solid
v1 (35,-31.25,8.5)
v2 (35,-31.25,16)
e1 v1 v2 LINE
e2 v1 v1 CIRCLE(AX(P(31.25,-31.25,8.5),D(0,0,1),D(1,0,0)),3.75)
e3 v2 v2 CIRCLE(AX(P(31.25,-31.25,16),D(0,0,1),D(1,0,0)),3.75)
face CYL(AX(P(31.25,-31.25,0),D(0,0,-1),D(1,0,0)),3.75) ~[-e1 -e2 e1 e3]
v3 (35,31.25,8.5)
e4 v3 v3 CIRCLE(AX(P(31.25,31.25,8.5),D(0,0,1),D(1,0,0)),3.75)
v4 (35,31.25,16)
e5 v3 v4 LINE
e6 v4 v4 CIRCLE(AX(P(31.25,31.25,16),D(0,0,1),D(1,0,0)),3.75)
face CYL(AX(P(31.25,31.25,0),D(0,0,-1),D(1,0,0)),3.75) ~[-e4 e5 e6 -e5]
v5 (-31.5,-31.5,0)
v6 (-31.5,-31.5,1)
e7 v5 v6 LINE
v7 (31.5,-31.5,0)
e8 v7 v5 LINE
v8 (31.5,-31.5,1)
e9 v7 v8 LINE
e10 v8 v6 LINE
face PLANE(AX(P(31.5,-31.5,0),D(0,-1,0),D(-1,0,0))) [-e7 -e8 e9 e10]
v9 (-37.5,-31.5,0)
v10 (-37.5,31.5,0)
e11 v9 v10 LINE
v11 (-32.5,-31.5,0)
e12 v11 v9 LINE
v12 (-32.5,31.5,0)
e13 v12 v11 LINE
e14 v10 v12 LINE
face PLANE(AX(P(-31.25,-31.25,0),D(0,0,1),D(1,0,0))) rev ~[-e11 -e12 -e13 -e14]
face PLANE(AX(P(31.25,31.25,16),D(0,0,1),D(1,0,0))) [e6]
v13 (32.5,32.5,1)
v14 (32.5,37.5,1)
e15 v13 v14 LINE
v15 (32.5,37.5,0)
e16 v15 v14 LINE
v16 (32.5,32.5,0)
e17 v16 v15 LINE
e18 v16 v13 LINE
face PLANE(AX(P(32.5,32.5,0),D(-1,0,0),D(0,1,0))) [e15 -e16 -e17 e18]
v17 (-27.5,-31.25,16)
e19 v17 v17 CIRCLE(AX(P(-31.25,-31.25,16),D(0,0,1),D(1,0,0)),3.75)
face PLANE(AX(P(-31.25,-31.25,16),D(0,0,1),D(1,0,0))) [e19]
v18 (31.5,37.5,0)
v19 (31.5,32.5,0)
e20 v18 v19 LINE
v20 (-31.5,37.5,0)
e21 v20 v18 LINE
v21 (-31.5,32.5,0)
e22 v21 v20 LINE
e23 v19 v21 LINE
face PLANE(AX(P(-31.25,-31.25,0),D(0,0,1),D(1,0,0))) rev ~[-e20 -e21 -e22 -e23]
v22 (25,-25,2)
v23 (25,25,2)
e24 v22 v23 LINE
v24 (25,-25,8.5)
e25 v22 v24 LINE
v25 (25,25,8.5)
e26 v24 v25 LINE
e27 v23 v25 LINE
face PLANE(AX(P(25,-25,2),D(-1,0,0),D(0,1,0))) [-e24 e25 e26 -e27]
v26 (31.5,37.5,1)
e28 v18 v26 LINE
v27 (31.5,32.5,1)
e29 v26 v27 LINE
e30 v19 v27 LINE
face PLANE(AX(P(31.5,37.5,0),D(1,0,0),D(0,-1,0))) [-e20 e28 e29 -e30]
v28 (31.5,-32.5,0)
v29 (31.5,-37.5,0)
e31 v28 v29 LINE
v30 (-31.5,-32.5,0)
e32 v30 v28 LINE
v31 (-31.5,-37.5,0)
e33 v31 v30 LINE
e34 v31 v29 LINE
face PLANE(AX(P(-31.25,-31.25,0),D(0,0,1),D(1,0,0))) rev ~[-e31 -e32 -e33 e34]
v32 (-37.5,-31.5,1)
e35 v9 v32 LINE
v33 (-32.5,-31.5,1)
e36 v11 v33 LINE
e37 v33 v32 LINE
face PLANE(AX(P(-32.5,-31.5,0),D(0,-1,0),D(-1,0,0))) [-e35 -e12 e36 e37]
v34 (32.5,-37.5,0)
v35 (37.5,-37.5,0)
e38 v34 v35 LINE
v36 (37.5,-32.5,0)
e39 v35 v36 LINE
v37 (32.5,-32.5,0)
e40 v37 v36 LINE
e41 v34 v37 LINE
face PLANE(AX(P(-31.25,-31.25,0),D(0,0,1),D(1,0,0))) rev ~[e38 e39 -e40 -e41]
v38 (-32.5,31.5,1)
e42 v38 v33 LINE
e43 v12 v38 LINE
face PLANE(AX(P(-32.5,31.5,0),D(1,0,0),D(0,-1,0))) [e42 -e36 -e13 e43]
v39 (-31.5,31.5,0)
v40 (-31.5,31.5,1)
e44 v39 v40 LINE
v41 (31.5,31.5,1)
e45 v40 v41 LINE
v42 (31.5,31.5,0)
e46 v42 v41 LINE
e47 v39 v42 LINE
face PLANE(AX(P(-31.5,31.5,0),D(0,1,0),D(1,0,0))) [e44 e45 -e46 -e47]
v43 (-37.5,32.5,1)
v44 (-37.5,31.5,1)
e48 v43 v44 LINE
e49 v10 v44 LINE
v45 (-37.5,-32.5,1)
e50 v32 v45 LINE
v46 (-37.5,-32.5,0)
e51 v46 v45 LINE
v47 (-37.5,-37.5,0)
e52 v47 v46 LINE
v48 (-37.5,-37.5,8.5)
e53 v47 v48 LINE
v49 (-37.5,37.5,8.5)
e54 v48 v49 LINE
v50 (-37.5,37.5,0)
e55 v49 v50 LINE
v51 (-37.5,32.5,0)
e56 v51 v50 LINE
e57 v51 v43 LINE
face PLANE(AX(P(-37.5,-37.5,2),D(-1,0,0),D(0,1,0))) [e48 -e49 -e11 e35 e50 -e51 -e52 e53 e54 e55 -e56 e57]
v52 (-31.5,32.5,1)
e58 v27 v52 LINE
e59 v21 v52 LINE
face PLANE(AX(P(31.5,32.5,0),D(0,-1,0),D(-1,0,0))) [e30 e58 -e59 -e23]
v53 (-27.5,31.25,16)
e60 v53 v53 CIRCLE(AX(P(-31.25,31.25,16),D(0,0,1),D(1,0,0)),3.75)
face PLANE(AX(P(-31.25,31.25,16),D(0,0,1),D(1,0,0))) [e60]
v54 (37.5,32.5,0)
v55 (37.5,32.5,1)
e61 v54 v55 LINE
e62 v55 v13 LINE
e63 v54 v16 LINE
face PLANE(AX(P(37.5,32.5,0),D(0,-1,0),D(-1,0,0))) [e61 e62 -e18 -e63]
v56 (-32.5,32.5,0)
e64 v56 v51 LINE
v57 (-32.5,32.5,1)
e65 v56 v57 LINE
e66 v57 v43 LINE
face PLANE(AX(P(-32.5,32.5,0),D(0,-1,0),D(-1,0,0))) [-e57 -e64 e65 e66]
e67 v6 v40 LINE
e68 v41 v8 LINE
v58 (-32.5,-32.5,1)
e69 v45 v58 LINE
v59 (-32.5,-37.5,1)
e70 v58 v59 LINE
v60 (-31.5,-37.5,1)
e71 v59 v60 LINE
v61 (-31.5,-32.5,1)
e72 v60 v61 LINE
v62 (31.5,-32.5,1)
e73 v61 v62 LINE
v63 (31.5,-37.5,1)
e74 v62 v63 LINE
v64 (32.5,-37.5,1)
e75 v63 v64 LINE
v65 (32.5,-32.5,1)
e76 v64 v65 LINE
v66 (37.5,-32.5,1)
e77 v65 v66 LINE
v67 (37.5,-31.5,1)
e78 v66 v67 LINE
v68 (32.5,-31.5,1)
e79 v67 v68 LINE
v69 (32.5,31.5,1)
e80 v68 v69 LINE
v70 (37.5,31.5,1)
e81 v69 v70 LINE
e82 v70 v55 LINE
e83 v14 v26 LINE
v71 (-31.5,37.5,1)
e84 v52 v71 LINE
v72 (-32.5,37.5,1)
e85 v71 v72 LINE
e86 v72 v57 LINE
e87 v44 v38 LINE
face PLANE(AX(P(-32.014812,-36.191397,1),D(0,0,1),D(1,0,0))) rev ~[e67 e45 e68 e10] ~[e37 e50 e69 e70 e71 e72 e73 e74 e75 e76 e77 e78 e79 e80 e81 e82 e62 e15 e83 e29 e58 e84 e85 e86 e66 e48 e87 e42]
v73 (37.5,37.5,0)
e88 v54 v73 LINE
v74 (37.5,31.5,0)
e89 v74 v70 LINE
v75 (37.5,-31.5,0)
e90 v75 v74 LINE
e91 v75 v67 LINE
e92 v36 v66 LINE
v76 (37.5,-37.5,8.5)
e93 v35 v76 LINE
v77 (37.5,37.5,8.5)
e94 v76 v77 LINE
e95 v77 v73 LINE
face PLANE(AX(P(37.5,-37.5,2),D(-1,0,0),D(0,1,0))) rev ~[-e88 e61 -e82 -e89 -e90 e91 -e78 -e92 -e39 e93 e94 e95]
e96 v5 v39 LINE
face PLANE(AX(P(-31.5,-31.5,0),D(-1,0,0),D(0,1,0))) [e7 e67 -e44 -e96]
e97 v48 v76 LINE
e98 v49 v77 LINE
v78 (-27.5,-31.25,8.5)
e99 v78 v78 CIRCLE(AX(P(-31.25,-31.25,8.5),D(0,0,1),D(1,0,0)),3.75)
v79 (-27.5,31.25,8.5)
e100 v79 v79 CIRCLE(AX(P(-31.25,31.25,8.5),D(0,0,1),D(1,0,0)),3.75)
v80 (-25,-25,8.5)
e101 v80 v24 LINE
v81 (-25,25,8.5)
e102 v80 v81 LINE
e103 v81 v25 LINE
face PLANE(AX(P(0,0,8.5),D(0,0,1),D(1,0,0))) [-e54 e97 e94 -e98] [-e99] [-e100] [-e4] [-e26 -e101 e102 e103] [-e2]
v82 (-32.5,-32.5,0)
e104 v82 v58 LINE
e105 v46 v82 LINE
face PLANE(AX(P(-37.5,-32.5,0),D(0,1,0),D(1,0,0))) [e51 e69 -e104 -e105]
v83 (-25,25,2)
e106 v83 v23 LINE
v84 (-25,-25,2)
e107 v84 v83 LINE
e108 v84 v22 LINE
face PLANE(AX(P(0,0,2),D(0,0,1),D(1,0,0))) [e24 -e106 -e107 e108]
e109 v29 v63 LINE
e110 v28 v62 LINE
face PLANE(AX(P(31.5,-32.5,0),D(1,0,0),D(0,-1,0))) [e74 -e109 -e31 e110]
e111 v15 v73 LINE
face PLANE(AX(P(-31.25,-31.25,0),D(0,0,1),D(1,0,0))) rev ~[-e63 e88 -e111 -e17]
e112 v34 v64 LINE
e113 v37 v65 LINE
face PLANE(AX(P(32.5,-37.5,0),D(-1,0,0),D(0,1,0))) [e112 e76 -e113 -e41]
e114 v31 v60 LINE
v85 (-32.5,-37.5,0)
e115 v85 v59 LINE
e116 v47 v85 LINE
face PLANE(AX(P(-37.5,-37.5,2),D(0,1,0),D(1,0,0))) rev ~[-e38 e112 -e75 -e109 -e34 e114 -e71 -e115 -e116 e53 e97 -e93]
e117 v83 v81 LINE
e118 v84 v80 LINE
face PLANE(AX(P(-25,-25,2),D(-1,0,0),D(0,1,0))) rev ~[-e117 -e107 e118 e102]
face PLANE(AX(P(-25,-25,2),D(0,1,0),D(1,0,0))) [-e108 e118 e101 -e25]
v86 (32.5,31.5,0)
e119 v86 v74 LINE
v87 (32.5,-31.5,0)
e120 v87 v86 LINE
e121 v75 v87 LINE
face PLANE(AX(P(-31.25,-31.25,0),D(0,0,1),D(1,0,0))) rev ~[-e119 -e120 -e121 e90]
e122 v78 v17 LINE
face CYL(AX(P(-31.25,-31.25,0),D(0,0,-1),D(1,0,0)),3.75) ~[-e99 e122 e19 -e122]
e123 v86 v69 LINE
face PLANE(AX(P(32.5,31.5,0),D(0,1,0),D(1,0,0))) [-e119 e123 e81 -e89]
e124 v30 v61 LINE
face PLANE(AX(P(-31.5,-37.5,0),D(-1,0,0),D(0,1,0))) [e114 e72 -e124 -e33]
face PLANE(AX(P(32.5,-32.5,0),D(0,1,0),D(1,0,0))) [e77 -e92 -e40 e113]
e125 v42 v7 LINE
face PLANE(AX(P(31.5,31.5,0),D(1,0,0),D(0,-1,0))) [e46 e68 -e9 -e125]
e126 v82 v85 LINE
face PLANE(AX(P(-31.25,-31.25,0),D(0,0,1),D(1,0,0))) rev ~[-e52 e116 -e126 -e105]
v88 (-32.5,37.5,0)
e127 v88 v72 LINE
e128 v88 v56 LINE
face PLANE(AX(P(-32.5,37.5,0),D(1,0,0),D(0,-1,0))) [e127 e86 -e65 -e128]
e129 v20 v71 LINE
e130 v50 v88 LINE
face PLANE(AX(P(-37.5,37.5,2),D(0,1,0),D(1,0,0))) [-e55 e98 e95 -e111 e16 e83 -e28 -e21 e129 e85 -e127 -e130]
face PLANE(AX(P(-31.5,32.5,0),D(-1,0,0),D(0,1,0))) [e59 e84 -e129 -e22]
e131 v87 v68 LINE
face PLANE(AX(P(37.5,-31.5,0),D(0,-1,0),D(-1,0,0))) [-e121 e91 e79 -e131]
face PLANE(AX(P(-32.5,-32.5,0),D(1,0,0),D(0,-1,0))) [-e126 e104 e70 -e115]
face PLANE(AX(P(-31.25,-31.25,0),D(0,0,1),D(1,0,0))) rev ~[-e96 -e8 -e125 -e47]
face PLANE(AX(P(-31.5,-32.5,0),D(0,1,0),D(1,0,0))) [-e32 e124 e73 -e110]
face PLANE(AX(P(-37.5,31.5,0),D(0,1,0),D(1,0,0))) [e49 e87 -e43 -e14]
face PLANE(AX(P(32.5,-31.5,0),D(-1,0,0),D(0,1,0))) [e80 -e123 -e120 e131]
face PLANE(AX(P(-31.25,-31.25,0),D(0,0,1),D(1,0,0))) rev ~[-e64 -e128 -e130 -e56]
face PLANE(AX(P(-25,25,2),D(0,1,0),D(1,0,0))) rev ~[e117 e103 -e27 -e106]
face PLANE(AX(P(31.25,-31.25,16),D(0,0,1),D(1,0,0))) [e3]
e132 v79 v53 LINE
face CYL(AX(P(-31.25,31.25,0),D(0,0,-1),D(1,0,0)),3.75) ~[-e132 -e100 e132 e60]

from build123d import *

# Parameters (mm, degrees)
F0_W     = 75
F0_H     = 75
F0_R     = 3.75
F1_DEPTH = 2
F2_DEPTH = 16
F3_W     = 75
F3_H     = 75
F3_R     = 3.75
F3_W_2   = 50
F3_H_2   = 50
F4_DEPTH = 6.5
F5_W     = 1
F5_H     = 1
F6_DEPTH = 1


with BuildPart() as f1:
    # F0 (on Top) → F1 (new body)
    with BuildSketch(Plane.XY):
        Rectangle(F0_W, F0_H)
        with Locations((-31.25, -31.25)):
            Circle(F0_R, mode=Mode.SUBTRACT)
        with Locations((31.25, -31.25)):
            Circle(F0_R, mode=Mode.SUBTRACT)
        with Locations((-31.25, 31.25)):
            Circle(F0_R, mode=Mode.SUBTRACT)
        with Locations((31.25, 31.25)):
            Circle(F0_R, mode=Mode.SUBTRACT)
        with Locations((-31.25, 31.25)):
            Circle(F0_R)
        with Locations((31.25, 31.25)):
            Circle(F0_R)
        with Locations((31.25, -31.25)):
            Circle(F0_R)
        with Locations((-31.25, -31.25)):
            Circle(F0_R)
    extrude(amount=F1_DEPTH)

    # F0 (on Top) → F2 (join)
    with BuildSketch(Plane.XY):
        with Locations((-31.25, -31.25)):
            Circle(F0_R)
        with Locations((31.25, -31.25)):
            Circle(F0_R)
        with Locations((-31.25, 31.25)):
            Circle(F0_R)
        with Locations((31.25, 31.25)):
            Circle(F0_R)
    extrude(amount=F2_DEPTH)

    # F3 (on face) → F4 (join)
    with BuildSketch(Plane.XY.offset(2)):
        Rectangle(F3_W, F3_H)
        with Locations((-31.25, -31.25)):
            Circle(F3_R, mode=Mode.SUBTRACT)
        with Locations((31.25, -31.25)):
            Circle(F3_R, mode=Mode.SUBTRACT)
        with Locations((-31.25, 31.25)):
            Circle(F3_R, mode=Mode.SUBTRACT)
        Rectangle(F3_W_2, F3_H_2, mode=Mode.SUBTRACT)
        with Locations((31.25, 31.25)):
            Circle(F3_R, mode=Mode.SUBTRACT)
    extrude(amount=F4_DEPTH)

    # F5 (on face) → F6 (cut)
    with BuildSketch(Plane.XY):
        with BuildLine():
            Line((-32.5, -34.7855339059), (-32.5, -37.5))
            Line((-32.5, -37.5), (-31.5, -37.5))
            Line((-31.5, -37.5), (-31.5, -34.9916573868))
            ThreePointArc((-31.5, -34.9916573868), (-32.0070480317, -34.9227888964), (-32.5, -34.7855339059))
        make_face()
        with BuildLine():
            Line((-32.5, -32.5), (-32.5, -34.7855339059))
            ThreePointArc((-32.5, -34.7855339059), (-32.0070480317, -34.9227888964), (-31.5, -34.9916573868))
            Line((-31.5, -34.9916573868), (-31.5, -32.5))
            Line((-31.5, -32.5), (-32.5, -32.5))
        make_face()
        with BuildLine():
            Line((31.5, -34.9916573868), (31.5, -37.5))
            Line((31.5, -37.5), (32.5, -37.5))
            Line((32.5, -37.5), (32.5, -34.7855339059))
            ThreePointArc((32.5, -34.7855339059), (32.0070480317, -34.9227888964), (31.5, -34.9916573868))
        make_face()
        with BuildLine():
            Line((-34.7855339059, -32.5), (-32.5, -32.5))
            Line((-32.5, -32.5), (-32.5, -31.5))
            Line((-32.5, -31.5), (-34.9916573868, -31.5))
            ThreePointArc((-34.9916573868, -31.5), (-34.9227888964, -32.0070480317), (-34.7855339059, -32.5))
        make_face()
        with Locations((-32, -32)):
            Rectangle(F5_W, F5_H)
        with BuildLine():
            Line((-37.5, -32.5), (-34.7855339059, -32.5))
            ThreePointArc((-34.7855339059, -32.5), (-34.9227888964, -32.0070480317), (-34.9916573868, -31.5))
            Line((-34.9916573868, -31.5), (-37.5, -31.5))
            Line((-37.5, -31.5), (-37.5, -32.5))
        make_face()
        with BuildLine():
            Line((-31.5, -31.5), (-31.5, -32.5))
            Line((-31.5, -32.5), (-27.7144660941, -32.5))
            ThreePointArc((-27.7144660941, -32.5), (-27.5772111036, -32.0070480317), (-27.5083426132, -31.5))
            Line((-27.5083426132, -31.5), (-31.5, -31.5))
        make_face()
        with BuildLine():
            ThreePointArc((-27.5083426132, -31.5), (-27.5772111036, -32.0070480317), (-27.7144660941, -32.5))
            Line((-27.7144660941, -32.5), (27.7144660941, -32.5))
            ThreePointArc((27.7144660941, -32.5), (27.5772111036, -32.0070480317), (27.5083426132, -31.5))
            Line((27.5083426132, -31.5), (-27.5083426132, -31.5))
        make_face()
        with BuildLine():
            Line((31.5, -32.5), (31.5, -34.9916573868))
            ThreePointArc((31.5, -34.9916573868), (32.0070480317, -34.9227888964), (32.5, -34.7855339059))
            Line((32.5, -34.7855339059), (32.5, -32.5))
            Line((32.5, -32.5), (31.5, -32.5))
        make_face()
        with BuildLine():
            Line((-32.5, -27.7144660941), (-32.5, -31.5))
            Line((-32.5, -31.5), (-31.5, -31.5))
            Line((-31.5, -31.5), (-31.5, -27.5083426132))
            ThreePointArc((-31.5, -27.5083426132), (-32.0070480317, -27.5772111036), (-32.5, -27.7144660941))
        make_face()
        with BuildLine():
            ThreePointArc((27.5083426132, -31.5), (27.5772111036, -32.0070480317), (27.7144660941, -32.5))
            Line((27.7144660941, -32.5), (31.5, -32.5))
            Line((31.5, -32.5), (31.5, -31.5))
            Line((31.5, -31.5), (27.5083426132, -31.5))
        make_face()
        with Locations((32, -32)):
            Rectangle(F5_W, F5_H)
        with BuildLine():
            Line((-32.5, 27.7144660941), (-32.5, -27.7144660941))
            ThreePointArc((-32.5, -27.7144660941), (-32.0070480317, -27.5772111036), (-31.5, -27.5083426132))
            Line((-31.5, -27.5083426132), (-31.5, 27.5083426132))
            ThreePointArc((-31.5, 27.5083426132), (-32.0070480317, 27.5772111036), (-32.5, 27.7144660941))
        make_face()
        with BuildLine():
            Line((-37.5, 32.5), (-37.5, 31.5))
            Line((-37.5, 31.5), (-34.9916573868, 31.5))
            ThreePointArc((-34.9916573868, 31.5), (-34.9227888964, 32.0070480317), (-34.7855339059, 32.5))
            Line((-34.7855339059, 32.5), (-37.5, 32.5))
        make_face()
        with BuildLine():
            Line((32.5, -31.5), (32.5, -32.5))
            Line((32.5, -32.5), (34.7855339059, -32.5))
            ThreePointArc((34.7855339059, -32.5), (34.9227888964, -32.0070480317), (34.9916573868, -31.5))
            Line((34.9916573868, -31.5), (32.5, -31.5))
        make_face()
        with BuildLine():
            ThreePointArc((34.9916573868, -31.5), (34.9227888964, -32.0070480317), (34.7855339059, -32.5))
            Line((34.7855339059, -32.5), (37.5, -32.5))
            Line((37.5, -32.5), (37.5, -31.5))
            Line((37.5, -31.5), (34.9916573868, -31.5))
        make_face()
        with BuildLine():
            Line((31.5, -27.5083426132), (31.5, -31.5))
            Line((31.5, -31.5), (32.5, -31.5))
            Line((32.5, -31.5), (32.5, -27.7144660941))
            ThreePointArc((32.5, -27.7144660941), (32.0070480317, -27.5772111036), (31.5, -27.5083426132))
        make_face()
        with BuildLine():
            Line((-32.5, 31.5), (-32.5, 27.7144660941))
            ThreePointArc((-32.5, 27.7144660941), (-32.0070480317, 27.5772111036), (-31.5, 27.5083426132))
            Line((-31.5, 27.5083426132), (-31.5, 31.5))
            Line((-31.5, 31.5), (-32.5, 31.5))
        make_face()
        with BuildLine():
            ThreePointArc((-34.7855339059, 32.5), (-34.9227888964, 32.0070480317), (-34.9916573868, 31.5))
            Line((-34.9916573868, 31.5), (-32.5, 31.5))
            Line((-32.5, 31.5), (-32.5, 32.5))
            Line((-32.5, 32.5), (-34.7855339059, 32.5))
        make_face()
        with BuildLine():
            Line((31.5, 27.5083426132), (31.5, -27.5083426132))
            ThreePointArc((31.5, -27.5083426132), (32.0070480317, -27.5772111036), (32.5, -27.7144660941))
            Line((32.5, -27.7144660941), (32.5, 27.7144660941))
            ThreePointArc((32.5, 27.7144660941), (32.0070480317, 27.5772111036), (31.5, 27.5083426132))
        make_face()
        with Locations((-32, 32)):
            Rectangle(F5_W, F5_H)
        with BuildLine():
            Line((-31.5, 32.5), (-31.5, 31.5))
            Line((-31.5, 31.5), (-27.5083426132, 31.5))
            ThreePointArc((-27.5083426132, 31.5), (-27.5772111036, 32.0070480317), (-27.7144660941, 32.5))
            Line((-27.7144660941, 32.5), (-31.5, 32.5))
        make_face()
        with BuildLine():
            Line((31.5, 31.5), (31.5, 27.5083426132))
            ThreePointArc((31.5, 27.5083426132), (32.0070480317, 27.5772111036), (32.5, 27.7144660941))
            Line((32.5, 27.7144660941), (32.5, 31.5))
            Line((32.5, 31.5), (31.5, 31.5))
        make_face()
        with BuildLine():
            Line((34.9916573868, 31.5), (37.5, 31.5))
            Line((37.5, 31.5), (37.5, 32.5))
            Line((37.5, 32.5), (34.7855339059, 32.5))
            ThreePointArc((34.7855339059, 32.5), (34.9227888964, 32.0070480317), (34.9916573868, 31.5))
        make_face()
        with BuildLine():
            Line((-32.5, 34.7855339059), (-32.5, 32.5))
            Line((-32.5, 32.5), (-31.5, 32.5))
            Line((-31.5, 32.5), (-31.5, 34.9916573868))
            ThreePointArc((-31.5, 34.9916573868), (-32.0070480317, 34.9227888964), (-32.5, 34.7855339059))
        make_face()
        with BuildLine():
            Line((-32.5, 37.5), (-32.5, 34.7855339059))
            ThreePointArc((-32.5, 34.7855339059), (-32.0070480317, 34.9227888964), (-31.5, 34.9916573868))
            Line((-31.5, 34.9916573868), (-31.5, 37.5))
            Line((-31.5, 37.5), (-32.5, 37.5))
        make_face()
        with BuildLine():
            ThreePointArc((-27.7144660941, 32.5), (-27.5772111036, 32.0070480317), (-27.5083426132, 31.5))
            Line((-27.5083426132, 31.5), (27.5083426132, 31.5))
            ThreePointArc((27.5083426132, 31.5), (27.5772111036, 32.0070480317), (27.7144660941, 32.5))
            Line((27.7144660941, 32.5), (-27.7144660941, 32.5))
        make_face()
        with BuildLine():
            Line((27.5083426132, 31.5), (31.5, 31.5))
            Line((31.5, 31.5), (31.5, 32.5))
            Line((31.5, 32.5), (27.7144660941, 32.5))
            ThreePointArc((27.7144660941, 32.5), (27.5772111036, 32.0070480317), (27.5083426132, 31.5))
        make_face()
        with Locations((32, 32)):
            Rectangle(F5_W, F5_H)
        with BuildLine():
            Line((32.5, 31.5), (34.9916573868, 31.5))
            ThreePointArc((34.9916573868, 31.5), (34.9227888964, 32.0070480317), (34.7855339059, 32.5))
            Line((34.7855339059, 32.5), (32.5, 32.5))
            Line((32.5, 32.5), (32.5, 31.5))
        make_face()
        with BuildLine():
            Line((31.5, 34.9916573868), (31.5, 32.5))
            Line((31.5, 32.5), (32.5, 32.5))
            Line((32.5, 32.5), (32.5, 34.7855339059))
            ThreePointArc((32.5, 34.7855339059), (32.0070480317, 34.9227888964), (31.5, 34.9916573868))
        make_face()
        with BuildLine():
            Line((32.5, 37.5), (31.5, 37.5))
            Line((31.5, 37.5), (31.5, 34.9916573868))
            ThreePointArc((31.5, 34.9916573868), (32.0070480317, 34.9227888964), (32.5, 34.7855339059))
            Line((32.5, 34.7855339059), (32.5, 37.5))
        make_face()
    extrude(amount=F6_DEPTH, mode=Mode.SUBTRACT)


solid = f1.part
